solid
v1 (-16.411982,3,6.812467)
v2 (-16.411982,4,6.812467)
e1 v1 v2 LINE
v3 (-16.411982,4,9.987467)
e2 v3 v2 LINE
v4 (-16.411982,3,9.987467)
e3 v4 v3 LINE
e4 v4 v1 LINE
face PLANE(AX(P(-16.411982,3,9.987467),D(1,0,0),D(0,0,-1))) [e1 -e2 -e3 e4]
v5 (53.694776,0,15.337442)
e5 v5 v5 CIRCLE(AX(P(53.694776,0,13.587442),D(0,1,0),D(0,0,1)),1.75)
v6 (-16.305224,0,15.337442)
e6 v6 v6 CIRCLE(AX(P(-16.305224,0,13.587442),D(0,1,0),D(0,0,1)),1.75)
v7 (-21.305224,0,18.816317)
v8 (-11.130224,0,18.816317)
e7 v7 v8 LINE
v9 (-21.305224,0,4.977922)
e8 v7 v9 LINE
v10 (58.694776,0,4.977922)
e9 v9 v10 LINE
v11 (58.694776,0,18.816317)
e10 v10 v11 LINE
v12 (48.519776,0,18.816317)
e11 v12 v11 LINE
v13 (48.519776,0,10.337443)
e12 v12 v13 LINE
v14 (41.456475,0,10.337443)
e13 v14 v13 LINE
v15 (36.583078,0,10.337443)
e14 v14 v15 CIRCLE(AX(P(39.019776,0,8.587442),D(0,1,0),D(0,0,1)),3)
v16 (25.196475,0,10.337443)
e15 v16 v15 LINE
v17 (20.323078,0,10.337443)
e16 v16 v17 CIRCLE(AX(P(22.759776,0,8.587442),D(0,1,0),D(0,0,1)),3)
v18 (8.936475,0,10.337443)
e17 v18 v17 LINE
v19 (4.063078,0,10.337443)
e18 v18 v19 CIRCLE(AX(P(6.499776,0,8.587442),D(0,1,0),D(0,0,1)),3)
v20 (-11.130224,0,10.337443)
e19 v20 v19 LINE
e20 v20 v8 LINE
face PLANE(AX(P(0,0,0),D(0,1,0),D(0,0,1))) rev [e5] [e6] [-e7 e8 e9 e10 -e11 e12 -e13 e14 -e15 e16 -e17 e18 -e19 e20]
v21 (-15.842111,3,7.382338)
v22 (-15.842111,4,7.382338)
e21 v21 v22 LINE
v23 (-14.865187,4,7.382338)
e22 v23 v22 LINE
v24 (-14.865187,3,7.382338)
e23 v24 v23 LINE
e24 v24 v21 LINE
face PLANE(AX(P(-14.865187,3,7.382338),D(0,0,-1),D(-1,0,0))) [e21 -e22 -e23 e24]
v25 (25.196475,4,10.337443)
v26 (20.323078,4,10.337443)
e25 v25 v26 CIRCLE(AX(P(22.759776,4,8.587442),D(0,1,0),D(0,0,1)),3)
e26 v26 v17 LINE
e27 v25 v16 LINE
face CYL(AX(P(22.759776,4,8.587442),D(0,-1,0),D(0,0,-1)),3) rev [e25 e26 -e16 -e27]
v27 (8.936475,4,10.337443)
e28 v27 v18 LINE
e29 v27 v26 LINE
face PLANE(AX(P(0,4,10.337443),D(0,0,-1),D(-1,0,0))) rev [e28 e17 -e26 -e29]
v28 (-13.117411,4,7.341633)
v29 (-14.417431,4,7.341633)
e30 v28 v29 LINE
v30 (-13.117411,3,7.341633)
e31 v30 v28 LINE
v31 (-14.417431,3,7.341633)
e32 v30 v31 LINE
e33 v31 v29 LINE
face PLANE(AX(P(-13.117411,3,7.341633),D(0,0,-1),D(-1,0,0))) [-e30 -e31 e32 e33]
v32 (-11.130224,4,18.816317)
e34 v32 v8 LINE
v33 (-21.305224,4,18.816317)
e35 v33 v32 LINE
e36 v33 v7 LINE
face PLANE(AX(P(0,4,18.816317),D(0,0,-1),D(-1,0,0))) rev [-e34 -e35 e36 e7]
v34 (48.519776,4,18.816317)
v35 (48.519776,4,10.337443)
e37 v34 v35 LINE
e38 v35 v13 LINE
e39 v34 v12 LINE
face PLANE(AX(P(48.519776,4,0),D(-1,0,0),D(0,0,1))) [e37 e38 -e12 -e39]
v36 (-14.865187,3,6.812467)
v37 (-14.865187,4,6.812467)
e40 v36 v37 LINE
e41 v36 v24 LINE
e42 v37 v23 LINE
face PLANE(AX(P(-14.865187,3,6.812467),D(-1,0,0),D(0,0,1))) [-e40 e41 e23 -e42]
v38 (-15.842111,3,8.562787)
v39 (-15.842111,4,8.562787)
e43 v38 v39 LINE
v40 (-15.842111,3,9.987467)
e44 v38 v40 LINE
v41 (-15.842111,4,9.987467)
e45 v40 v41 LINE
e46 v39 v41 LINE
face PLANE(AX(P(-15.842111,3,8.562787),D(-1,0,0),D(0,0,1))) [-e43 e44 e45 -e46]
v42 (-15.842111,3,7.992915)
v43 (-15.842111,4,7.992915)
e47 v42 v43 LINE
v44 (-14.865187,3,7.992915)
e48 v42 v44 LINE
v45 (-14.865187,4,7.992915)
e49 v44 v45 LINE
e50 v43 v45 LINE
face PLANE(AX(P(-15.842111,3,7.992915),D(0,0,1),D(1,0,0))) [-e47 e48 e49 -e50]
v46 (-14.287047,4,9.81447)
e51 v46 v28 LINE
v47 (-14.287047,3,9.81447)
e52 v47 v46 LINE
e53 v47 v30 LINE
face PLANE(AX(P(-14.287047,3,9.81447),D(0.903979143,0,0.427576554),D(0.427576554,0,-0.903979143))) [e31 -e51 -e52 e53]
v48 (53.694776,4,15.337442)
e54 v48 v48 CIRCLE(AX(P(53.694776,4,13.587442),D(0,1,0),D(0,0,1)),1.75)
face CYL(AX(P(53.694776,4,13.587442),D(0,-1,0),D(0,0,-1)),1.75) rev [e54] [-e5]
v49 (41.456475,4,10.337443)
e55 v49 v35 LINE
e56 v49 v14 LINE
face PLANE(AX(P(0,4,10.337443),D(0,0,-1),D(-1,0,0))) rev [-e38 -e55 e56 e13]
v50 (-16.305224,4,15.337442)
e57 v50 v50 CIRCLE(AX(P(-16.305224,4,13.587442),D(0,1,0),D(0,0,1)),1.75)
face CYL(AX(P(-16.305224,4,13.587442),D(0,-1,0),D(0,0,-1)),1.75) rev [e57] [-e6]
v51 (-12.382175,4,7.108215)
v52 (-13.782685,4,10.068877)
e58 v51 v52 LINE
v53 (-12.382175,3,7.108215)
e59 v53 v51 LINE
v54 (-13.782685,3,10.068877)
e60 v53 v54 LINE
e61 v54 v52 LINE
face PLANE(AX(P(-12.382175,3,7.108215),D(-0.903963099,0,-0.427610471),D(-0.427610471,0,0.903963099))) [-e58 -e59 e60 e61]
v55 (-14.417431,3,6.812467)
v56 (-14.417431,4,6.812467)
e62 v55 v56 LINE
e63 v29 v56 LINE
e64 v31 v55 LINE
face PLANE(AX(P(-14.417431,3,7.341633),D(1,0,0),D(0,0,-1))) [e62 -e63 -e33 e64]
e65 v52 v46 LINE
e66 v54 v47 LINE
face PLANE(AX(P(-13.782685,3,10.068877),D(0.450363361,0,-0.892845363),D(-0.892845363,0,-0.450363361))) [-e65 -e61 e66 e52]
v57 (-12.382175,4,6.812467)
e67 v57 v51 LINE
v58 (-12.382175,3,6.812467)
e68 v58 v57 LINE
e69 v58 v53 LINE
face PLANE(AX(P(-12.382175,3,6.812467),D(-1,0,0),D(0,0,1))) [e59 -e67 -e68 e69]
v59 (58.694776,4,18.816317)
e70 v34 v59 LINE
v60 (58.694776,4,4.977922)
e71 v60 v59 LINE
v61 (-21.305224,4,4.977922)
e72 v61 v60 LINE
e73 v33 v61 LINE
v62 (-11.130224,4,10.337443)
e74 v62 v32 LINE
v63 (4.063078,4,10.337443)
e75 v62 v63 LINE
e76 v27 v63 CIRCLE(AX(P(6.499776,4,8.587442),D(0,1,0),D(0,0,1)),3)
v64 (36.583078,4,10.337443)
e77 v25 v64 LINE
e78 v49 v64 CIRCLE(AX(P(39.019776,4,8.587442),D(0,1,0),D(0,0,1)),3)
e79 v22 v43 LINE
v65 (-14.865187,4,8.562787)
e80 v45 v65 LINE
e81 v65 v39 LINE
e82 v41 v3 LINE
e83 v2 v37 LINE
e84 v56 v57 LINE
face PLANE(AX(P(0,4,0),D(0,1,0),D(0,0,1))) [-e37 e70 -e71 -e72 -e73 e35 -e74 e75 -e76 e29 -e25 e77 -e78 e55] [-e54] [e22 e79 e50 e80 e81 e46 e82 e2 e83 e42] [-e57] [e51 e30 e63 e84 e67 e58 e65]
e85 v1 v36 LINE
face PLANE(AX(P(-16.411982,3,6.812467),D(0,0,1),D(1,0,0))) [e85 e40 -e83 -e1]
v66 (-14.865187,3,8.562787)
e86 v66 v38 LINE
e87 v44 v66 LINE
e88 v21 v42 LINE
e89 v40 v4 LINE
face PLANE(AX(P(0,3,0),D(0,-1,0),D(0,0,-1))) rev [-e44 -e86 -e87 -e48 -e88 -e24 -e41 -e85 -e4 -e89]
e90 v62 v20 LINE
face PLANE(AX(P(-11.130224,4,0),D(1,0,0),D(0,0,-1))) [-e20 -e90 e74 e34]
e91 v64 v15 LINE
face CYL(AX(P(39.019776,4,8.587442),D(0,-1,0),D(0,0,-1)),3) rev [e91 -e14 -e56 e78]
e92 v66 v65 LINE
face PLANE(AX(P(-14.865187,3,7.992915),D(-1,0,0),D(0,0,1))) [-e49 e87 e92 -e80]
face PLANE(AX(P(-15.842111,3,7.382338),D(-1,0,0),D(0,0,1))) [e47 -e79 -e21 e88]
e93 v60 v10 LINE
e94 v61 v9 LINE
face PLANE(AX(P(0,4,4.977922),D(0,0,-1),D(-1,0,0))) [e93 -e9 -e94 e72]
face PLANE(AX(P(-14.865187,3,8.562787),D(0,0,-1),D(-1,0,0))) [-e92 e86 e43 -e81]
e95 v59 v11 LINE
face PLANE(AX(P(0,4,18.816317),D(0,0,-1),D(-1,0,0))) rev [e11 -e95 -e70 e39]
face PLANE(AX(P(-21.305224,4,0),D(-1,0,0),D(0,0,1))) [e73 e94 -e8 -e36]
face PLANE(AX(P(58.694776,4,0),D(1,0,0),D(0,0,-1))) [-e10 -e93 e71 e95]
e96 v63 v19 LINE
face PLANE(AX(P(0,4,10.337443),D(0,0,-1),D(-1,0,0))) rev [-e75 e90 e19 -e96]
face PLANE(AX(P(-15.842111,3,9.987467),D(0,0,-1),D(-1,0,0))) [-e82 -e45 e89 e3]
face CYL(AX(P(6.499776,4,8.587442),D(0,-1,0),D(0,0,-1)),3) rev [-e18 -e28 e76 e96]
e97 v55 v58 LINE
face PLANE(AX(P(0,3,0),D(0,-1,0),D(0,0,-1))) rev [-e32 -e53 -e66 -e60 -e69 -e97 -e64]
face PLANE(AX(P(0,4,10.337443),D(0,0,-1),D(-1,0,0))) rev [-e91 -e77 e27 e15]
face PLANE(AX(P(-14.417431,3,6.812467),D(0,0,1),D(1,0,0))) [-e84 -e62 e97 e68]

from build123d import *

# Parameters (mm, degrees)
BOSS_EXTRUDE1_OUTLINE_R = 1.75
BOSS_EXTRUDE1_DEPTH     = 4
CUT_EXTRUDE1_DEPTH      = 1


# Read off the part's stored shape, not the designer's step: Boss-Extrude1
with BuildPart() as part:
    # Boss-Extrude1 outline → Boss-Extrude1 (new body)
    with BuildSketch(Plane(origin=(0, 0, 0), x_dir=(1, 0, 0), z_dir=(0, 1, 0))):
        with BuildLine():
            Line((25.196474615, -10.33744254), (36.58307775, -10.33744254))
            ThreePointArc((36.58307775, -10.33744254), (39.019776183, -5.587442326), (41.456474615, -10.33744254))
            Line((41.456474615, -10.33744254), (48.519776182, -10.33744254))
            Line((48.519776182, -10.33744254), (48.519776182, -18.81631662))
            Line((48.519776182, -18.81631662), (58.694776182, -18.81631662))
            Line((58.694776182, -18.81631662), (58.694776182, -4.977921711))
            Line((58.694776182, -4.977921711), (-21.305223818, -4.977921711))
            Line((-21.305223818, -4.977921711), (-21.305223818, -18.81631662))
            Line((-21.305223818, -18.81631662), (-11.130223818, -18.81631662))
            Line((-11.130223818, -18.81631662), (-11.130223818, -10.33744254))
            Line((-11.130223818, -10.33744254), (4.06307775, -10.33744254))
            ThreePointArc((4.06307775, -10.33744254), (6.499776182, -5.587442326), (8.936474615, -10.33744254))
            Line((8.936474615, -10.33744254), (20.32307775, -10.33744254))
            ThreePointArc((20.32307775, -10.33744254), (22.759776182, -5.587442326), (25.196474615, -10.33744254))
        make_face()
        with Locations((-16.305223818, -13.587442433)):
            Circle(BOSS_EXTRUDE1_OUTLINE_R, mode=Mode.SUBTRACT)
        with Locations((53.694776182, -13.587442433)):
            Circle(BOSS_EXTRUDE1_OUTLINE_R, mode=Mode.SUBTRACT)
    extrude(amount=BOSS_EXTRUDE1_DEPTH)

    # Sketch2 → Cut-Extrude1 (cut)
    with BuildSketch(Plane(origin=(0, 4, 0), x_dir=(1, 0, 0), z_dir=(0, 1, 0))):
        Polygon((-16.41198232, -6.812466594), (-14.865187448, -6.812466594), (-14.865187448, -7.382338389), (-15.842110525, -7.382338389), (-15.842110525, -7.992915312), (-14.865187448, -7.992915312), (-14.865187448, -8.562787107), (-15.842110525, -8.562787107), (-15.842110525, -9.987466594), (-16.41198232, -9.987466594), align=None)
        Polygon((-14.417431038, -6.812466594), (-12.382174628, -6.812466594), (-12.382174628, -7.108214791), (-13.782685445, -10.06887685), (-14.287047424, -9.814469799), (-13.117411006, -7.341633261), (-14.417431038, -7.341633261), align=None)
    extrude(amount=-CUT_EXTRUDE1_DEPTH, mode=Mode.SUBTRACT)


solid = part.part
